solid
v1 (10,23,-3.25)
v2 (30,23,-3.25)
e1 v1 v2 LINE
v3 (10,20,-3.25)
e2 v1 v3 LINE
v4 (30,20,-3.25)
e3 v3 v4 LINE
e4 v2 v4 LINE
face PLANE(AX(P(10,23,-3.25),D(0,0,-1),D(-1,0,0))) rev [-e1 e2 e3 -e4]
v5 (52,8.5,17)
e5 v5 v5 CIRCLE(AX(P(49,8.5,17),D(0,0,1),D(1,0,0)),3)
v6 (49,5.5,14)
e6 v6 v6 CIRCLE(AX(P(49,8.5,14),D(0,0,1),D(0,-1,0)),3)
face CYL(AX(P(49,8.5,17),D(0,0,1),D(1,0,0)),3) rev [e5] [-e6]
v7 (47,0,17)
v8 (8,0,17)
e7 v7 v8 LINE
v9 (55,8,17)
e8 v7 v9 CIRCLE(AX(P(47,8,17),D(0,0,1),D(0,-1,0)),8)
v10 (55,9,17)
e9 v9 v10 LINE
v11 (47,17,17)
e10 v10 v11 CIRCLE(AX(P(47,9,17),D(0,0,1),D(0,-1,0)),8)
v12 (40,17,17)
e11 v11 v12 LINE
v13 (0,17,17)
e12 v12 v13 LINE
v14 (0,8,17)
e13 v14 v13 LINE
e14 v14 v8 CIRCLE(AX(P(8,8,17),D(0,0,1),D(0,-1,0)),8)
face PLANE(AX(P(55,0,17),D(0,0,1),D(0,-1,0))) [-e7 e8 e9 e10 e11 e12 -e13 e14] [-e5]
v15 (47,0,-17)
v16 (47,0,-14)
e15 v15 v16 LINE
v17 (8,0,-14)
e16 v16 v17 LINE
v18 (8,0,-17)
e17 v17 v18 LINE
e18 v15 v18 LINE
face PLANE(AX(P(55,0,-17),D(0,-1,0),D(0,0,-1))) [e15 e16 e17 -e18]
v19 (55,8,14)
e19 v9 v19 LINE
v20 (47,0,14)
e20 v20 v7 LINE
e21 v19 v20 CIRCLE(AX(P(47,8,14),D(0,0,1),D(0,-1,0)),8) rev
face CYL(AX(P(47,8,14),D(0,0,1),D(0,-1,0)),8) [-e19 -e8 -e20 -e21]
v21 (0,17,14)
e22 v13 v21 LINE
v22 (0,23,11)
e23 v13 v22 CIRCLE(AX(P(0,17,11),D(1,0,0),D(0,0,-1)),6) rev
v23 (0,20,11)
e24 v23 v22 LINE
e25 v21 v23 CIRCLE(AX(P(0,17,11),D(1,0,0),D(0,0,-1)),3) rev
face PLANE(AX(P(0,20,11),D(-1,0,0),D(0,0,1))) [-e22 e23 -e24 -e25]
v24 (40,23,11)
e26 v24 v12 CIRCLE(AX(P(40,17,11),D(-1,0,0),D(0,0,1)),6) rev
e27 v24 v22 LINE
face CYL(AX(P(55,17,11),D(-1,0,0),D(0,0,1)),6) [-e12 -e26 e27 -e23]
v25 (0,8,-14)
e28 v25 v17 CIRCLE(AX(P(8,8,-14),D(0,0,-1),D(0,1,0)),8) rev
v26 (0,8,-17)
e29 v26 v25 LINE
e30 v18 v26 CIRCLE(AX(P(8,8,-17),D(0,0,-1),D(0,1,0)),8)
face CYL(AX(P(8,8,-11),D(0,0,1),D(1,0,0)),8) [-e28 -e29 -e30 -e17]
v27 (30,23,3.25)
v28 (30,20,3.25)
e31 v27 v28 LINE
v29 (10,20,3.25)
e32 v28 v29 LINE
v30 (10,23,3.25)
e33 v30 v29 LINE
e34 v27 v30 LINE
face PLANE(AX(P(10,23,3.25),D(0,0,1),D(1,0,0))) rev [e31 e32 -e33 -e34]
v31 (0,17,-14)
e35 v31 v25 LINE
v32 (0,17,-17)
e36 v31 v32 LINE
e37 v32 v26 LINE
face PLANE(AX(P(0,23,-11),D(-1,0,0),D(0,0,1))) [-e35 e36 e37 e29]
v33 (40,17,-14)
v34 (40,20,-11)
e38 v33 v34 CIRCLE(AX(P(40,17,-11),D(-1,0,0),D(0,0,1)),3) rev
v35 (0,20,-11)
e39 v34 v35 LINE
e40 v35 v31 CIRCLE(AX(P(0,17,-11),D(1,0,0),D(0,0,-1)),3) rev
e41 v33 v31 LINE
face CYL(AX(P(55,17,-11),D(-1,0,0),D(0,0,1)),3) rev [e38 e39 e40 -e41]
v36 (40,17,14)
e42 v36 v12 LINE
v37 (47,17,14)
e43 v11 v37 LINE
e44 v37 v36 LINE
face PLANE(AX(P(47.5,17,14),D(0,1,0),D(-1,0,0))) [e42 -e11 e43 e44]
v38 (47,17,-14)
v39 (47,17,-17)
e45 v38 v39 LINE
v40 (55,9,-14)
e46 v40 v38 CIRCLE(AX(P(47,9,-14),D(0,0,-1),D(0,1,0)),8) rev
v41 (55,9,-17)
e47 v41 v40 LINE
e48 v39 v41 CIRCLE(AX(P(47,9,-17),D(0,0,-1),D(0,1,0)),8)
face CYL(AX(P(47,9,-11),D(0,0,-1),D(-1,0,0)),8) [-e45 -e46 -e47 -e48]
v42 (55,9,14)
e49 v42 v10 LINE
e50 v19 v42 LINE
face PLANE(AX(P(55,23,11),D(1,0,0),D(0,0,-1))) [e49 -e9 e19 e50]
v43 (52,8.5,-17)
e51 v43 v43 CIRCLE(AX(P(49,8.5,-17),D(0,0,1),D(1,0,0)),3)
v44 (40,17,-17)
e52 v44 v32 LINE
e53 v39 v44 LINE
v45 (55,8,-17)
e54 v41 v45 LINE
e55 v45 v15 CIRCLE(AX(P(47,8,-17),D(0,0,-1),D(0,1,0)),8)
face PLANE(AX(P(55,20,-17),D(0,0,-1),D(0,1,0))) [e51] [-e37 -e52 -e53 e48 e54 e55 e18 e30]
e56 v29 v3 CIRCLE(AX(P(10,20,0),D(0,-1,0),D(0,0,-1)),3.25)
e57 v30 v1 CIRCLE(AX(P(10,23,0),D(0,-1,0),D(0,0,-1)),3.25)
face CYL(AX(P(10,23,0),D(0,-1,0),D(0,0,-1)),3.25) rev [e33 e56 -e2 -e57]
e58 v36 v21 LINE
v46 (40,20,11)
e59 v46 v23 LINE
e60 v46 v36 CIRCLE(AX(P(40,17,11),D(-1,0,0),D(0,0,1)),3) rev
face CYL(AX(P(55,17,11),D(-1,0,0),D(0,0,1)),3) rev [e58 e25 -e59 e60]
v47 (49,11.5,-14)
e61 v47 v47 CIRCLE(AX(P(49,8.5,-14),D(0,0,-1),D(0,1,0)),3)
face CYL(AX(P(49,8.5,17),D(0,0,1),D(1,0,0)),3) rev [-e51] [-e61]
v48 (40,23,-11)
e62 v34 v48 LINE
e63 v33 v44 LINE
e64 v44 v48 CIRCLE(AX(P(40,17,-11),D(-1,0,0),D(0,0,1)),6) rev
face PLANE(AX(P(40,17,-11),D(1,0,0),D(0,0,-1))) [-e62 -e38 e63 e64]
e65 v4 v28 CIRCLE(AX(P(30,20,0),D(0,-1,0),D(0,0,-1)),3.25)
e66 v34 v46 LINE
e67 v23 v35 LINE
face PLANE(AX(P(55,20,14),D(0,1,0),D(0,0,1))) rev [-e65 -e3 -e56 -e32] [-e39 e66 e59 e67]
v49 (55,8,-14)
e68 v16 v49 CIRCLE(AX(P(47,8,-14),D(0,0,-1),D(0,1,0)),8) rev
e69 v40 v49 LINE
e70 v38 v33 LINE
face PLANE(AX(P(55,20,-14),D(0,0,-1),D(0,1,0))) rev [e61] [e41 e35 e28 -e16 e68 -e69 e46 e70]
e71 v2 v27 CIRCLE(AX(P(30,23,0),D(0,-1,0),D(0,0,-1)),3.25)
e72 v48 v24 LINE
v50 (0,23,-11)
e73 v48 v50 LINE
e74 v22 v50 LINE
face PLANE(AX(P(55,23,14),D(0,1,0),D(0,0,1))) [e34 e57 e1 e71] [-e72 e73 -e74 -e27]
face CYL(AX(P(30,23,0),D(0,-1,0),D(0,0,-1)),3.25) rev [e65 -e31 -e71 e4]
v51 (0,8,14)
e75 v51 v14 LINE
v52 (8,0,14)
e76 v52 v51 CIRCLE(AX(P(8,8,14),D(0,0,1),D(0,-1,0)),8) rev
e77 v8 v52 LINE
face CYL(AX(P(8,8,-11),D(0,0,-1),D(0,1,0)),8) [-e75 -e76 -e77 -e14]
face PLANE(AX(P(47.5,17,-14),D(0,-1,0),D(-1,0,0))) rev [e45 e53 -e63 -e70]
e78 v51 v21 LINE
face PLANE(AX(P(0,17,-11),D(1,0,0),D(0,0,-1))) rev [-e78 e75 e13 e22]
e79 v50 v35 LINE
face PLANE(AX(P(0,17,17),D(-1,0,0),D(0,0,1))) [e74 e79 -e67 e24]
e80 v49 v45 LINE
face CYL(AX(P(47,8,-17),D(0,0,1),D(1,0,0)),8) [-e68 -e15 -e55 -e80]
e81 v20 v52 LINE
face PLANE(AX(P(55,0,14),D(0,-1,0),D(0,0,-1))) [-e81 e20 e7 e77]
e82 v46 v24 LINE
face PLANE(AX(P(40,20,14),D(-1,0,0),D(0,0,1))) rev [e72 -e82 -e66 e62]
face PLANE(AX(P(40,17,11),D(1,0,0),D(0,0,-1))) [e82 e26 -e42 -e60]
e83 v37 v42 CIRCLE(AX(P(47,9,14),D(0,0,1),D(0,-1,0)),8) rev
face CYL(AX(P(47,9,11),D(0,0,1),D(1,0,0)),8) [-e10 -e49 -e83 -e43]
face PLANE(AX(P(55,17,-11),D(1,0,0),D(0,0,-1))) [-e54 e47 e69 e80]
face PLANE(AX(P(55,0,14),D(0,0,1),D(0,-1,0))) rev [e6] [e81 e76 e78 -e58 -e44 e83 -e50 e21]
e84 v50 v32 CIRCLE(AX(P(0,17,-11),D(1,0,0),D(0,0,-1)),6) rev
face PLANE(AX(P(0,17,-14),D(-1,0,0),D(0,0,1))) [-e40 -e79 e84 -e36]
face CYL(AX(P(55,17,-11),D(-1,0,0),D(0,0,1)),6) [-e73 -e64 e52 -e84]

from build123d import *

# Parameters (mm, degrees)
BASE_FLANGE1_DEPTH       = 55
EXTRUDE1_START           = -23
EXTRUDE1_OUTLINE_W       = 15
EXTRUDE1_OUTLINE_H       = 36
EXTRUDE1_DEPTH           = 6
F_6_0_6_DIAMETER_HOLE1_D = 6
FILLET1_R                = 8
EXTRUDE2_DEPTH           = 61.942595941
FILLET2_R                = 8


# Read off the part's stored shape, not the designer's step: Extrude1
# Sheet-metal steps are written as plain solids
with BuildPart() as part:
    # Sketch1 → Base-Flange1 (new body)
    with BuildSketch(Plane(origin=(0, 0, 0), x_dir=(0, 0, -1), z_dir=(1, 0, 0))):
        with BuildLine():
            Line((-14, 0), (-14, 17))
            ThreePointArc((-14, 17), (-13.121320344, 19.121320344), (-11, 20))
            Line((-11, 20), (11, 20))
            ThreePointArc((11, 20), (13.121320344, 19.121320344), (14, 17))
            Line((14, 17), (14, 0))
            Line((14, 0), (17, 0))
            Line((17, 0), (17, 17))
            ThreePointArc((17, 17), (15.242640687, 21.242640687), (11, 23))
            Line((11, 23), (-11, 23))
            ThreePointArc((-11, 23), (-15.242640687, 21.242640687), (-17, 17))
            Line((-17, 17), (-17, 0))
            Line((-17, 0), (-14, 0))
        make_face()
    extrude(amount=BASE_FLANGE1_DEPTH)

    # Extrude1 outline → Extrude1 (cut)
    with BuildSketch(Plane.XZ.offset(EXTRUDE1_START)):
        with Locations((47.5, 0)):
            Rectangle(EXTRUDE1_OUTLINE_W, EXTRUDE1_OUTLINE_H)
    extrude(amount=EXTRUDE1_DEPTH, mode=Mode.SUBTRACT)

    # Ø6.0 (6) Diameter Hole1 (through all)
    with Locations(Plane.XY.offset(17)):
        with Locations((49, 8.5)):
            Hole(F_6_0_6_DIAMETER_HOLE1_D / 2)

    # Fillet1
    fillet1_edges = [part.edges().sort_by_distance(p)[0] for p in [
        (55, 0, 15.5),
        (55, 17, -15.5),
        (55, 17, 15.5),
        (55, 0, -15.5),
    ]]
    fillet(fillet1_edges, radius=FILLET1_R)

    # Sketch11 → Extrude2 (cut, through all)
    with BuildSketch(Plane.XZ.offset(-20)):
        with BuildLine():
            Line((10, 3.25), (30, 3.25))
            ThreePointArc((30, 3.25), (33.25, 0), (30, -3.25))
            Line((30, -3.25), (10, -3.25))
            ThreePointArc((10, -3.25), (6.75, 0), (10, 3.25))
        make_face()
    extrude(amount=-EXTRUDE2_DEPTH, mode=Mode.SUBTRACT)

    # Fillet2
    fillet2_edges = [part.edges().sort_by_distance(p)[0] for p in [
        (0, 0, 15.5),
        (0, 0, -15.5),
    ]]
    fillet(fillet2_edges, radius=FILLET2_R)


solid = part.part
